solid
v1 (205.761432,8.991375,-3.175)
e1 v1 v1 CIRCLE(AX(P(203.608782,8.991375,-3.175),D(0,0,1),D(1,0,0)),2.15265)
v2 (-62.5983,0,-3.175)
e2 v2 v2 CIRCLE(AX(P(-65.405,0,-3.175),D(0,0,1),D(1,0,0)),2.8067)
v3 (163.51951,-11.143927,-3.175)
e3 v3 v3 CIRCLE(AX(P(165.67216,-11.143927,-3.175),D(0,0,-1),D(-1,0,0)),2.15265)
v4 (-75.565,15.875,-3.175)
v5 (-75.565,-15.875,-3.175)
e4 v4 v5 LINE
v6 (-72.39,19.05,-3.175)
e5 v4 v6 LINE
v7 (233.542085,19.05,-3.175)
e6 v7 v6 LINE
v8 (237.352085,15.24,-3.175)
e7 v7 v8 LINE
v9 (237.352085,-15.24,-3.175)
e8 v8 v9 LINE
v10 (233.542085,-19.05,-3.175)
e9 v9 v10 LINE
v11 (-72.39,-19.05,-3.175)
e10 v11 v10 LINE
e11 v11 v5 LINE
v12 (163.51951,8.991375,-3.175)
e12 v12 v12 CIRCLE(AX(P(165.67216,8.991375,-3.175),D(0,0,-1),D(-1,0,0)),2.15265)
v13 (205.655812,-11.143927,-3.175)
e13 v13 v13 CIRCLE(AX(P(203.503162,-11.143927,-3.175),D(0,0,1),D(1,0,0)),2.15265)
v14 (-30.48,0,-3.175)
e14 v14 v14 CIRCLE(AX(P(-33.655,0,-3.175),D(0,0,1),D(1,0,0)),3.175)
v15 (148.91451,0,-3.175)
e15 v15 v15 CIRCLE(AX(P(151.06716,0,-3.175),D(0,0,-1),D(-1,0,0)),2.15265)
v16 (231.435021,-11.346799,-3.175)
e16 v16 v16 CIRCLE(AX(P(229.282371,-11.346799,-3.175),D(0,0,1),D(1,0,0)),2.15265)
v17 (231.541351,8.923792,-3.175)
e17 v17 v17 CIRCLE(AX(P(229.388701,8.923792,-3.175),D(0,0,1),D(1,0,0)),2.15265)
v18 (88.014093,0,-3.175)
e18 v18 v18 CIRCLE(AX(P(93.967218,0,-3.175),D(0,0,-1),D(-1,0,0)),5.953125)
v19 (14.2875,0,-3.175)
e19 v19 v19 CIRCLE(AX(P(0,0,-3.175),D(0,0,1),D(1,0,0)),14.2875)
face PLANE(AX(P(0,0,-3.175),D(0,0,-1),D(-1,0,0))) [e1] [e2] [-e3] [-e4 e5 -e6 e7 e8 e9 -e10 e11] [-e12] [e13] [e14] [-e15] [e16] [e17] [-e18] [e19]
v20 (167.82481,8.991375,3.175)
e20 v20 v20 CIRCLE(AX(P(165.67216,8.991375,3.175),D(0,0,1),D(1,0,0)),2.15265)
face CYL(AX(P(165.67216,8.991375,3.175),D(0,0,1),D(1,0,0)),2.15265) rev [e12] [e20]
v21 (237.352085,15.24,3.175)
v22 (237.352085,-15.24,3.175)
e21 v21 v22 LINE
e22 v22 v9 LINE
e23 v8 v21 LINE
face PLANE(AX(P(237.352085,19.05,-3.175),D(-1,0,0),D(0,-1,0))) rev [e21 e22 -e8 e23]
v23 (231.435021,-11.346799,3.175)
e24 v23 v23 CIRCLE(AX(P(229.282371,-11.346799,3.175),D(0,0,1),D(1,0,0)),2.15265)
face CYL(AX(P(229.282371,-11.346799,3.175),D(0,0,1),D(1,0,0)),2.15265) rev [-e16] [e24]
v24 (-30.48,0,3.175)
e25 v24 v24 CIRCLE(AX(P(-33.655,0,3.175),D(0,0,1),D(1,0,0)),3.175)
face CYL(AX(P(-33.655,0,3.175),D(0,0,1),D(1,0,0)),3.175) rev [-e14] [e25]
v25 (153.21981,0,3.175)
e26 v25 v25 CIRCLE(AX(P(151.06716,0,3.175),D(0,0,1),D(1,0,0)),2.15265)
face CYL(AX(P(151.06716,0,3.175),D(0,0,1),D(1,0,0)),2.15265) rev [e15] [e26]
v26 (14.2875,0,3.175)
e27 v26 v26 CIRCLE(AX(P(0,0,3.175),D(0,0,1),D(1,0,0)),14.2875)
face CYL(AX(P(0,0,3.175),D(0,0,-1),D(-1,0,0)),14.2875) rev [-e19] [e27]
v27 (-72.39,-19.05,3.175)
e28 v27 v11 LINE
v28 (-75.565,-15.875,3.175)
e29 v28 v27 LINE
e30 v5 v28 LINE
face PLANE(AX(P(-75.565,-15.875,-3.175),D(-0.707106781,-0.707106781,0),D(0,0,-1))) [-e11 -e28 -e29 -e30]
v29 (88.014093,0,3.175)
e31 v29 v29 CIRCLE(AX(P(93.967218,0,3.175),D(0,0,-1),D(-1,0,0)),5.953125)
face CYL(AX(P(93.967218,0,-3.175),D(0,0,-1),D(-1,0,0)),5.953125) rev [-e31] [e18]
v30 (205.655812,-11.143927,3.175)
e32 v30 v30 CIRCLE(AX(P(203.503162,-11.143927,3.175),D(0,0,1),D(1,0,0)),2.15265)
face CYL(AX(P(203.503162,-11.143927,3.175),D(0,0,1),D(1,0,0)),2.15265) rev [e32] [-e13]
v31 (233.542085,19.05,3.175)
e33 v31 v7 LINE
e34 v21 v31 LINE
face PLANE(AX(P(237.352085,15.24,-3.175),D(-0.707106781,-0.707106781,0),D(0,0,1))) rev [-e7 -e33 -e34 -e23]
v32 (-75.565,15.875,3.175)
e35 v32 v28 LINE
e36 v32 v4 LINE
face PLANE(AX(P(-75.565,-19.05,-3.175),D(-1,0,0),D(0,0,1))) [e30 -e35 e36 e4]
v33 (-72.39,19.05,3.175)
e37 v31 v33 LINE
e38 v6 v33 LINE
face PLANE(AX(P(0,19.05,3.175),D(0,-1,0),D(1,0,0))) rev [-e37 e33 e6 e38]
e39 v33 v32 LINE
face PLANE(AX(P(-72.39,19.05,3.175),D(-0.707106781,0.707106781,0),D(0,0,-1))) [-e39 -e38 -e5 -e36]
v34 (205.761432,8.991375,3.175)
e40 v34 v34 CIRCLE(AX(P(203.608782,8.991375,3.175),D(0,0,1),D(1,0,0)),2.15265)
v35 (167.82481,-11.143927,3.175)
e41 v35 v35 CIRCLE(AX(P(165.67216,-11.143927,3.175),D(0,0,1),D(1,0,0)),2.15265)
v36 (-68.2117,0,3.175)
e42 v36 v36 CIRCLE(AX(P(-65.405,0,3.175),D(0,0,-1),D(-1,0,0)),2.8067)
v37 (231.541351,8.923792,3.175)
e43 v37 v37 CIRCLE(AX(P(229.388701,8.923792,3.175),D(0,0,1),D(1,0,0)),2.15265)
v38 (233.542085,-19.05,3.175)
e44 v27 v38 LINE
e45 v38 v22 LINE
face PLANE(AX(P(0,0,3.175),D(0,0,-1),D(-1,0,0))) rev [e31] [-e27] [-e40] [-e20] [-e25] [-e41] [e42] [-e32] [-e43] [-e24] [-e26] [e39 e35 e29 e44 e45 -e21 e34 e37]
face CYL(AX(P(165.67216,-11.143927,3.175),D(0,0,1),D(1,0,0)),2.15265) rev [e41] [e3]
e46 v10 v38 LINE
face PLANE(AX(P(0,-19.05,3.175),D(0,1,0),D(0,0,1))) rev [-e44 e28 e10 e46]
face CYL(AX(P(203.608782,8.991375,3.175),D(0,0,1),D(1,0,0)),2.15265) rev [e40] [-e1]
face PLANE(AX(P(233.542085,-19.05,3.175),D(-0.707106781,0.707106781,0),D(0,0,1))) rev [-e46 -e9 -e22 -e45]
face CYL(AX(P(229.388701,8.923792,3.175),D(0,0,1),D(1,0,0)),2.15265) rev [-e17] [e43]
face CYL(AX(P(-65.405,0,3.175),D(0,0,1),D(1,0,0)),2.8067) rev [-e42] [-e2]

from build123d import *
from build123d.topology import SkipClean

# Parameters (mm, degrees)
SKETCH1_R                                          = 14.2875
BOSS_EXTRUDE1_DEPTH                                = 3.175
F_6_CLEARANCE_HOLE3_D                              = 4.3053
CUT_EXTRUDE1_DEPTH                                 = 255.792513626
CHAMFER1_SIZE                                      = 3.81
SKETCH10_W                                         = 50.8
SKETCH10_H                                         = 38.1
BOSS_EXTRUDE2_DEPTH                                = 6.35
CHAMFER2_SIZE                                      = 3.175
CSK_FOR_10_FLAT_HEAD_MACHINE_SCREW_100_D           = 5.6134
CSK_FOR_10_FLAT_HEAD_MACHINE_SCREW_100_CSINK_D     = 9.779
CSK_FOR_10_FLAT_HEAD_MACHINE_SCREW_100_CSINK_ANGLE = 100
F_1_4_0_25_DIAMETER_HOLE1_D                        = 6.35
CSK_FOR_6_FLAT_HEAD_MACHINE_SCREW_100_D            = 4.3053
CSK_FOR_6_FLAT_HEAD_MACHINE_SCREW_100_CSINK_D      = 7.0866
CSK_FOR_6_FLAT_HEAD_MACHINE_SCREW_100_CSINK_ANGLE  = 100
F_15_32_0_46875_DIAMETER_HOLE1_D                   = 11.90625


# Read off the part's stored shape, not the designer's step: DeleteFace1
with BuildPart() as part:
    # Sketch1 → Boss-Extrude1 (new, symmetric)
    with BuildSketch(Plane.XY):
        Polygon((0, 19.05), (-28.575, 19.05), (-28.575, -19.05), (0, -19.05), (247.281942035, -19.05), (254, 19.05), align=None)
        Circle(SKETCH1_R, mode=Mode.SUBTRACT)
    extrude(amount=BOSS_EXTRUDE1_DEPTH, both=True)

    # #6 Clearance Hole3 (through all)
    with Locations(Plane.XY.offset(3.175)):
        with Locations((229.388701471, 8.923791784), (229.282371239, -11.346798968), (203.503161764, -11.143926969), (203.608782335, 8.991375351), (165.672159691, 8.991375351), (165.672159691, -11.143926969), (151.067159691, 0)):
            Hole(F_6_CLEARANCE_HOLE3_D / 2)

    # Sketch9 → Cut-Extrude1 (cut, through all)
    with BuildSketch(Plane.XY.offset(3.175)):
        Polygon((254, 19.05), (247.281942035, -19.05), (237.352085197, -19.05), (237.352085197, 19.05), align=None)
    extrude(amount=-CUT_EXTRUDE1_DEPTH, mode=Mode.SUBTRACT)

    # Chamfer1
    chamfer1_edges = [part.edges().sort_by_distance(p)[0] for p in [
        (-28.575, -19.05, 0),
        (-28.575, 19.05, 0),
        (237.352085197, 19.05, 0),
        (237.352085197, -19.05, 0),
    ]]
    chamfer(chamfer1_edges, length=CHAMFER1_SIZE)

    # Sketch10 → Boss-Extrude2 (add, through all)
    with BuildSketch(Plane.XY.offset(3.175)):
        with Locations((-50.165, 0)):
            Rectangle(SKETCH10_W, SKETCH10_H)
    extrude(amount=-BOSS_EXTRUDE2_DEPTH)

    # Chamfer2
    chamfer2_edges = [part.edges().sort_by_distance(p)[0] for p in [
        (-75.565, -19.05, 0),
        (-75.565, 19.05, 0),
    ]]
    chamfer(chamfer2_edges, length=CHAMFER2_SIZE)

    # CSK for #10 Flat Head Machine Screw (100)1 (through all)
    with Locations(Plane.XY.offset(3.175)):
        with Locations((-65.405, 0)):
            CounterSinkHole(CSK_FOR_10_FLAT_HEAD_MACHINE_SCREW_100_D / 2, CSK_FOR_10_FLAT_HEAD_MACHINE_SCREW_100_CSINK_D / 2, counter_sink_angle=CSK_FOR_10_FLAT_HEAD_MACHINE_SCREW_100_CSINK_ANGLE)

    # 1/4 (0.25) Diameter Hole1 (through all)
    with Locations(Plane.XY.offset(3.175)):
        with Locations((-33.655, 0)):
            Hole(F_1_4_0_25_DIAMETER_HOLE1_D / 2)

    # CSK for #6 Flat Head Machine Screw (100)1 (through all)
    with Locations(Plane(origin=(0, 0, -3.175), x_dir=(-1, 0, 0), z_dir=(0, 0, -1))):
        with Locations((-151.067159691, 0), (-165.672159691, -11.143926969), (-165.672159691, 8.991375351)):
            CounterSinkHole(CSK_FOR_6_FLAT_HEAD_MACHINE_SCREW_100_D / 2, CSK_FOR_6_FLAT_HEAD_MACHINE_SCREW_100_CSINK_D / 2, counter_sink_angle=CSK_FOR_6_FLAT_HEAD_MACHINE_SCREW_100_CSINK_ANGLE)

    # 15/32 (0.46875) Diameter Hole1 (through all)
    with Locations(Plane(origin=(0, 0, -3.175), x_dir=(-1, 0, 0), z_dir=(0, 0, -1))):
        with Locations((-93.967218212, 0)):
            Hole(F_15_32_0_46875_DIAMETER_HOLE1_D / 2)

    # DeleteFace1 outline → DeleteFace1 (revolve)
    with SkipClean():  # the faces are left unmerged after this step: merging them gives an invalid solid
        with BuildSketch(Plane(origin=(-65.405, 0, 0), x_dir=(1, 0, 0), z_dir=(0, -1, 0))):
            Polygon((2.8067, 3.175), (2.8067, 1.427323288), (4.8895, 3.175), align=None)
        revolve(axis=Axis((-65.405, 0, 0), (0, 0, 1)))
    add(part.part.scale(1), mode=Mode.REPLACE)  # the faces are merged on a copy

    # DeleteFace1 2 outline → DeleteFace1 2 (revolve)
    with BuildSketch(Plane(origin=(165.672159691, 8.991375351, 0), x_dir=(1, 0, 0), z_dir=(0, -1, 0))):
        Polygon((3.5433, -3.175), (2.15265, -2.008106098), (2.15265, -3.175), align=None)
    revolve(axis=Axis((165.672159691, 8.991375351, 0), (0, 0, 1)))

    # DeleteFace1 3 outline → DeleteFace1 3 (revolve)
    with BuildSketch(Plane(origin=(165.672159691, -11.143926969, 0), x_dir=(1, 0, 0), z_dir=(0, -1, 0))):
        Polygon((3.5433, -3.175), (2.15265, -2.008106098), (2.15265, -3.175), align=None)
    revolve(axis=Axis((165.672159691, -11.143926969, 0), (0, 0, 1)))

    # DeleteFace1 4 outline → DeleteFace1 4 (revolve)
    with BuildSketch(Plane(origin=(151.067159691, 0, 0), x_dir=(1, 0, 0), z_dir=(0, -1, 0))):
        Polygon((3.5433, -3.175), (2.15265, -2.008106098), (2.15265, -3.175), align=None)
    revolve(axis=Axis((151.067159691, 0, 0), (0, 0, 1)))


solid = part.part
